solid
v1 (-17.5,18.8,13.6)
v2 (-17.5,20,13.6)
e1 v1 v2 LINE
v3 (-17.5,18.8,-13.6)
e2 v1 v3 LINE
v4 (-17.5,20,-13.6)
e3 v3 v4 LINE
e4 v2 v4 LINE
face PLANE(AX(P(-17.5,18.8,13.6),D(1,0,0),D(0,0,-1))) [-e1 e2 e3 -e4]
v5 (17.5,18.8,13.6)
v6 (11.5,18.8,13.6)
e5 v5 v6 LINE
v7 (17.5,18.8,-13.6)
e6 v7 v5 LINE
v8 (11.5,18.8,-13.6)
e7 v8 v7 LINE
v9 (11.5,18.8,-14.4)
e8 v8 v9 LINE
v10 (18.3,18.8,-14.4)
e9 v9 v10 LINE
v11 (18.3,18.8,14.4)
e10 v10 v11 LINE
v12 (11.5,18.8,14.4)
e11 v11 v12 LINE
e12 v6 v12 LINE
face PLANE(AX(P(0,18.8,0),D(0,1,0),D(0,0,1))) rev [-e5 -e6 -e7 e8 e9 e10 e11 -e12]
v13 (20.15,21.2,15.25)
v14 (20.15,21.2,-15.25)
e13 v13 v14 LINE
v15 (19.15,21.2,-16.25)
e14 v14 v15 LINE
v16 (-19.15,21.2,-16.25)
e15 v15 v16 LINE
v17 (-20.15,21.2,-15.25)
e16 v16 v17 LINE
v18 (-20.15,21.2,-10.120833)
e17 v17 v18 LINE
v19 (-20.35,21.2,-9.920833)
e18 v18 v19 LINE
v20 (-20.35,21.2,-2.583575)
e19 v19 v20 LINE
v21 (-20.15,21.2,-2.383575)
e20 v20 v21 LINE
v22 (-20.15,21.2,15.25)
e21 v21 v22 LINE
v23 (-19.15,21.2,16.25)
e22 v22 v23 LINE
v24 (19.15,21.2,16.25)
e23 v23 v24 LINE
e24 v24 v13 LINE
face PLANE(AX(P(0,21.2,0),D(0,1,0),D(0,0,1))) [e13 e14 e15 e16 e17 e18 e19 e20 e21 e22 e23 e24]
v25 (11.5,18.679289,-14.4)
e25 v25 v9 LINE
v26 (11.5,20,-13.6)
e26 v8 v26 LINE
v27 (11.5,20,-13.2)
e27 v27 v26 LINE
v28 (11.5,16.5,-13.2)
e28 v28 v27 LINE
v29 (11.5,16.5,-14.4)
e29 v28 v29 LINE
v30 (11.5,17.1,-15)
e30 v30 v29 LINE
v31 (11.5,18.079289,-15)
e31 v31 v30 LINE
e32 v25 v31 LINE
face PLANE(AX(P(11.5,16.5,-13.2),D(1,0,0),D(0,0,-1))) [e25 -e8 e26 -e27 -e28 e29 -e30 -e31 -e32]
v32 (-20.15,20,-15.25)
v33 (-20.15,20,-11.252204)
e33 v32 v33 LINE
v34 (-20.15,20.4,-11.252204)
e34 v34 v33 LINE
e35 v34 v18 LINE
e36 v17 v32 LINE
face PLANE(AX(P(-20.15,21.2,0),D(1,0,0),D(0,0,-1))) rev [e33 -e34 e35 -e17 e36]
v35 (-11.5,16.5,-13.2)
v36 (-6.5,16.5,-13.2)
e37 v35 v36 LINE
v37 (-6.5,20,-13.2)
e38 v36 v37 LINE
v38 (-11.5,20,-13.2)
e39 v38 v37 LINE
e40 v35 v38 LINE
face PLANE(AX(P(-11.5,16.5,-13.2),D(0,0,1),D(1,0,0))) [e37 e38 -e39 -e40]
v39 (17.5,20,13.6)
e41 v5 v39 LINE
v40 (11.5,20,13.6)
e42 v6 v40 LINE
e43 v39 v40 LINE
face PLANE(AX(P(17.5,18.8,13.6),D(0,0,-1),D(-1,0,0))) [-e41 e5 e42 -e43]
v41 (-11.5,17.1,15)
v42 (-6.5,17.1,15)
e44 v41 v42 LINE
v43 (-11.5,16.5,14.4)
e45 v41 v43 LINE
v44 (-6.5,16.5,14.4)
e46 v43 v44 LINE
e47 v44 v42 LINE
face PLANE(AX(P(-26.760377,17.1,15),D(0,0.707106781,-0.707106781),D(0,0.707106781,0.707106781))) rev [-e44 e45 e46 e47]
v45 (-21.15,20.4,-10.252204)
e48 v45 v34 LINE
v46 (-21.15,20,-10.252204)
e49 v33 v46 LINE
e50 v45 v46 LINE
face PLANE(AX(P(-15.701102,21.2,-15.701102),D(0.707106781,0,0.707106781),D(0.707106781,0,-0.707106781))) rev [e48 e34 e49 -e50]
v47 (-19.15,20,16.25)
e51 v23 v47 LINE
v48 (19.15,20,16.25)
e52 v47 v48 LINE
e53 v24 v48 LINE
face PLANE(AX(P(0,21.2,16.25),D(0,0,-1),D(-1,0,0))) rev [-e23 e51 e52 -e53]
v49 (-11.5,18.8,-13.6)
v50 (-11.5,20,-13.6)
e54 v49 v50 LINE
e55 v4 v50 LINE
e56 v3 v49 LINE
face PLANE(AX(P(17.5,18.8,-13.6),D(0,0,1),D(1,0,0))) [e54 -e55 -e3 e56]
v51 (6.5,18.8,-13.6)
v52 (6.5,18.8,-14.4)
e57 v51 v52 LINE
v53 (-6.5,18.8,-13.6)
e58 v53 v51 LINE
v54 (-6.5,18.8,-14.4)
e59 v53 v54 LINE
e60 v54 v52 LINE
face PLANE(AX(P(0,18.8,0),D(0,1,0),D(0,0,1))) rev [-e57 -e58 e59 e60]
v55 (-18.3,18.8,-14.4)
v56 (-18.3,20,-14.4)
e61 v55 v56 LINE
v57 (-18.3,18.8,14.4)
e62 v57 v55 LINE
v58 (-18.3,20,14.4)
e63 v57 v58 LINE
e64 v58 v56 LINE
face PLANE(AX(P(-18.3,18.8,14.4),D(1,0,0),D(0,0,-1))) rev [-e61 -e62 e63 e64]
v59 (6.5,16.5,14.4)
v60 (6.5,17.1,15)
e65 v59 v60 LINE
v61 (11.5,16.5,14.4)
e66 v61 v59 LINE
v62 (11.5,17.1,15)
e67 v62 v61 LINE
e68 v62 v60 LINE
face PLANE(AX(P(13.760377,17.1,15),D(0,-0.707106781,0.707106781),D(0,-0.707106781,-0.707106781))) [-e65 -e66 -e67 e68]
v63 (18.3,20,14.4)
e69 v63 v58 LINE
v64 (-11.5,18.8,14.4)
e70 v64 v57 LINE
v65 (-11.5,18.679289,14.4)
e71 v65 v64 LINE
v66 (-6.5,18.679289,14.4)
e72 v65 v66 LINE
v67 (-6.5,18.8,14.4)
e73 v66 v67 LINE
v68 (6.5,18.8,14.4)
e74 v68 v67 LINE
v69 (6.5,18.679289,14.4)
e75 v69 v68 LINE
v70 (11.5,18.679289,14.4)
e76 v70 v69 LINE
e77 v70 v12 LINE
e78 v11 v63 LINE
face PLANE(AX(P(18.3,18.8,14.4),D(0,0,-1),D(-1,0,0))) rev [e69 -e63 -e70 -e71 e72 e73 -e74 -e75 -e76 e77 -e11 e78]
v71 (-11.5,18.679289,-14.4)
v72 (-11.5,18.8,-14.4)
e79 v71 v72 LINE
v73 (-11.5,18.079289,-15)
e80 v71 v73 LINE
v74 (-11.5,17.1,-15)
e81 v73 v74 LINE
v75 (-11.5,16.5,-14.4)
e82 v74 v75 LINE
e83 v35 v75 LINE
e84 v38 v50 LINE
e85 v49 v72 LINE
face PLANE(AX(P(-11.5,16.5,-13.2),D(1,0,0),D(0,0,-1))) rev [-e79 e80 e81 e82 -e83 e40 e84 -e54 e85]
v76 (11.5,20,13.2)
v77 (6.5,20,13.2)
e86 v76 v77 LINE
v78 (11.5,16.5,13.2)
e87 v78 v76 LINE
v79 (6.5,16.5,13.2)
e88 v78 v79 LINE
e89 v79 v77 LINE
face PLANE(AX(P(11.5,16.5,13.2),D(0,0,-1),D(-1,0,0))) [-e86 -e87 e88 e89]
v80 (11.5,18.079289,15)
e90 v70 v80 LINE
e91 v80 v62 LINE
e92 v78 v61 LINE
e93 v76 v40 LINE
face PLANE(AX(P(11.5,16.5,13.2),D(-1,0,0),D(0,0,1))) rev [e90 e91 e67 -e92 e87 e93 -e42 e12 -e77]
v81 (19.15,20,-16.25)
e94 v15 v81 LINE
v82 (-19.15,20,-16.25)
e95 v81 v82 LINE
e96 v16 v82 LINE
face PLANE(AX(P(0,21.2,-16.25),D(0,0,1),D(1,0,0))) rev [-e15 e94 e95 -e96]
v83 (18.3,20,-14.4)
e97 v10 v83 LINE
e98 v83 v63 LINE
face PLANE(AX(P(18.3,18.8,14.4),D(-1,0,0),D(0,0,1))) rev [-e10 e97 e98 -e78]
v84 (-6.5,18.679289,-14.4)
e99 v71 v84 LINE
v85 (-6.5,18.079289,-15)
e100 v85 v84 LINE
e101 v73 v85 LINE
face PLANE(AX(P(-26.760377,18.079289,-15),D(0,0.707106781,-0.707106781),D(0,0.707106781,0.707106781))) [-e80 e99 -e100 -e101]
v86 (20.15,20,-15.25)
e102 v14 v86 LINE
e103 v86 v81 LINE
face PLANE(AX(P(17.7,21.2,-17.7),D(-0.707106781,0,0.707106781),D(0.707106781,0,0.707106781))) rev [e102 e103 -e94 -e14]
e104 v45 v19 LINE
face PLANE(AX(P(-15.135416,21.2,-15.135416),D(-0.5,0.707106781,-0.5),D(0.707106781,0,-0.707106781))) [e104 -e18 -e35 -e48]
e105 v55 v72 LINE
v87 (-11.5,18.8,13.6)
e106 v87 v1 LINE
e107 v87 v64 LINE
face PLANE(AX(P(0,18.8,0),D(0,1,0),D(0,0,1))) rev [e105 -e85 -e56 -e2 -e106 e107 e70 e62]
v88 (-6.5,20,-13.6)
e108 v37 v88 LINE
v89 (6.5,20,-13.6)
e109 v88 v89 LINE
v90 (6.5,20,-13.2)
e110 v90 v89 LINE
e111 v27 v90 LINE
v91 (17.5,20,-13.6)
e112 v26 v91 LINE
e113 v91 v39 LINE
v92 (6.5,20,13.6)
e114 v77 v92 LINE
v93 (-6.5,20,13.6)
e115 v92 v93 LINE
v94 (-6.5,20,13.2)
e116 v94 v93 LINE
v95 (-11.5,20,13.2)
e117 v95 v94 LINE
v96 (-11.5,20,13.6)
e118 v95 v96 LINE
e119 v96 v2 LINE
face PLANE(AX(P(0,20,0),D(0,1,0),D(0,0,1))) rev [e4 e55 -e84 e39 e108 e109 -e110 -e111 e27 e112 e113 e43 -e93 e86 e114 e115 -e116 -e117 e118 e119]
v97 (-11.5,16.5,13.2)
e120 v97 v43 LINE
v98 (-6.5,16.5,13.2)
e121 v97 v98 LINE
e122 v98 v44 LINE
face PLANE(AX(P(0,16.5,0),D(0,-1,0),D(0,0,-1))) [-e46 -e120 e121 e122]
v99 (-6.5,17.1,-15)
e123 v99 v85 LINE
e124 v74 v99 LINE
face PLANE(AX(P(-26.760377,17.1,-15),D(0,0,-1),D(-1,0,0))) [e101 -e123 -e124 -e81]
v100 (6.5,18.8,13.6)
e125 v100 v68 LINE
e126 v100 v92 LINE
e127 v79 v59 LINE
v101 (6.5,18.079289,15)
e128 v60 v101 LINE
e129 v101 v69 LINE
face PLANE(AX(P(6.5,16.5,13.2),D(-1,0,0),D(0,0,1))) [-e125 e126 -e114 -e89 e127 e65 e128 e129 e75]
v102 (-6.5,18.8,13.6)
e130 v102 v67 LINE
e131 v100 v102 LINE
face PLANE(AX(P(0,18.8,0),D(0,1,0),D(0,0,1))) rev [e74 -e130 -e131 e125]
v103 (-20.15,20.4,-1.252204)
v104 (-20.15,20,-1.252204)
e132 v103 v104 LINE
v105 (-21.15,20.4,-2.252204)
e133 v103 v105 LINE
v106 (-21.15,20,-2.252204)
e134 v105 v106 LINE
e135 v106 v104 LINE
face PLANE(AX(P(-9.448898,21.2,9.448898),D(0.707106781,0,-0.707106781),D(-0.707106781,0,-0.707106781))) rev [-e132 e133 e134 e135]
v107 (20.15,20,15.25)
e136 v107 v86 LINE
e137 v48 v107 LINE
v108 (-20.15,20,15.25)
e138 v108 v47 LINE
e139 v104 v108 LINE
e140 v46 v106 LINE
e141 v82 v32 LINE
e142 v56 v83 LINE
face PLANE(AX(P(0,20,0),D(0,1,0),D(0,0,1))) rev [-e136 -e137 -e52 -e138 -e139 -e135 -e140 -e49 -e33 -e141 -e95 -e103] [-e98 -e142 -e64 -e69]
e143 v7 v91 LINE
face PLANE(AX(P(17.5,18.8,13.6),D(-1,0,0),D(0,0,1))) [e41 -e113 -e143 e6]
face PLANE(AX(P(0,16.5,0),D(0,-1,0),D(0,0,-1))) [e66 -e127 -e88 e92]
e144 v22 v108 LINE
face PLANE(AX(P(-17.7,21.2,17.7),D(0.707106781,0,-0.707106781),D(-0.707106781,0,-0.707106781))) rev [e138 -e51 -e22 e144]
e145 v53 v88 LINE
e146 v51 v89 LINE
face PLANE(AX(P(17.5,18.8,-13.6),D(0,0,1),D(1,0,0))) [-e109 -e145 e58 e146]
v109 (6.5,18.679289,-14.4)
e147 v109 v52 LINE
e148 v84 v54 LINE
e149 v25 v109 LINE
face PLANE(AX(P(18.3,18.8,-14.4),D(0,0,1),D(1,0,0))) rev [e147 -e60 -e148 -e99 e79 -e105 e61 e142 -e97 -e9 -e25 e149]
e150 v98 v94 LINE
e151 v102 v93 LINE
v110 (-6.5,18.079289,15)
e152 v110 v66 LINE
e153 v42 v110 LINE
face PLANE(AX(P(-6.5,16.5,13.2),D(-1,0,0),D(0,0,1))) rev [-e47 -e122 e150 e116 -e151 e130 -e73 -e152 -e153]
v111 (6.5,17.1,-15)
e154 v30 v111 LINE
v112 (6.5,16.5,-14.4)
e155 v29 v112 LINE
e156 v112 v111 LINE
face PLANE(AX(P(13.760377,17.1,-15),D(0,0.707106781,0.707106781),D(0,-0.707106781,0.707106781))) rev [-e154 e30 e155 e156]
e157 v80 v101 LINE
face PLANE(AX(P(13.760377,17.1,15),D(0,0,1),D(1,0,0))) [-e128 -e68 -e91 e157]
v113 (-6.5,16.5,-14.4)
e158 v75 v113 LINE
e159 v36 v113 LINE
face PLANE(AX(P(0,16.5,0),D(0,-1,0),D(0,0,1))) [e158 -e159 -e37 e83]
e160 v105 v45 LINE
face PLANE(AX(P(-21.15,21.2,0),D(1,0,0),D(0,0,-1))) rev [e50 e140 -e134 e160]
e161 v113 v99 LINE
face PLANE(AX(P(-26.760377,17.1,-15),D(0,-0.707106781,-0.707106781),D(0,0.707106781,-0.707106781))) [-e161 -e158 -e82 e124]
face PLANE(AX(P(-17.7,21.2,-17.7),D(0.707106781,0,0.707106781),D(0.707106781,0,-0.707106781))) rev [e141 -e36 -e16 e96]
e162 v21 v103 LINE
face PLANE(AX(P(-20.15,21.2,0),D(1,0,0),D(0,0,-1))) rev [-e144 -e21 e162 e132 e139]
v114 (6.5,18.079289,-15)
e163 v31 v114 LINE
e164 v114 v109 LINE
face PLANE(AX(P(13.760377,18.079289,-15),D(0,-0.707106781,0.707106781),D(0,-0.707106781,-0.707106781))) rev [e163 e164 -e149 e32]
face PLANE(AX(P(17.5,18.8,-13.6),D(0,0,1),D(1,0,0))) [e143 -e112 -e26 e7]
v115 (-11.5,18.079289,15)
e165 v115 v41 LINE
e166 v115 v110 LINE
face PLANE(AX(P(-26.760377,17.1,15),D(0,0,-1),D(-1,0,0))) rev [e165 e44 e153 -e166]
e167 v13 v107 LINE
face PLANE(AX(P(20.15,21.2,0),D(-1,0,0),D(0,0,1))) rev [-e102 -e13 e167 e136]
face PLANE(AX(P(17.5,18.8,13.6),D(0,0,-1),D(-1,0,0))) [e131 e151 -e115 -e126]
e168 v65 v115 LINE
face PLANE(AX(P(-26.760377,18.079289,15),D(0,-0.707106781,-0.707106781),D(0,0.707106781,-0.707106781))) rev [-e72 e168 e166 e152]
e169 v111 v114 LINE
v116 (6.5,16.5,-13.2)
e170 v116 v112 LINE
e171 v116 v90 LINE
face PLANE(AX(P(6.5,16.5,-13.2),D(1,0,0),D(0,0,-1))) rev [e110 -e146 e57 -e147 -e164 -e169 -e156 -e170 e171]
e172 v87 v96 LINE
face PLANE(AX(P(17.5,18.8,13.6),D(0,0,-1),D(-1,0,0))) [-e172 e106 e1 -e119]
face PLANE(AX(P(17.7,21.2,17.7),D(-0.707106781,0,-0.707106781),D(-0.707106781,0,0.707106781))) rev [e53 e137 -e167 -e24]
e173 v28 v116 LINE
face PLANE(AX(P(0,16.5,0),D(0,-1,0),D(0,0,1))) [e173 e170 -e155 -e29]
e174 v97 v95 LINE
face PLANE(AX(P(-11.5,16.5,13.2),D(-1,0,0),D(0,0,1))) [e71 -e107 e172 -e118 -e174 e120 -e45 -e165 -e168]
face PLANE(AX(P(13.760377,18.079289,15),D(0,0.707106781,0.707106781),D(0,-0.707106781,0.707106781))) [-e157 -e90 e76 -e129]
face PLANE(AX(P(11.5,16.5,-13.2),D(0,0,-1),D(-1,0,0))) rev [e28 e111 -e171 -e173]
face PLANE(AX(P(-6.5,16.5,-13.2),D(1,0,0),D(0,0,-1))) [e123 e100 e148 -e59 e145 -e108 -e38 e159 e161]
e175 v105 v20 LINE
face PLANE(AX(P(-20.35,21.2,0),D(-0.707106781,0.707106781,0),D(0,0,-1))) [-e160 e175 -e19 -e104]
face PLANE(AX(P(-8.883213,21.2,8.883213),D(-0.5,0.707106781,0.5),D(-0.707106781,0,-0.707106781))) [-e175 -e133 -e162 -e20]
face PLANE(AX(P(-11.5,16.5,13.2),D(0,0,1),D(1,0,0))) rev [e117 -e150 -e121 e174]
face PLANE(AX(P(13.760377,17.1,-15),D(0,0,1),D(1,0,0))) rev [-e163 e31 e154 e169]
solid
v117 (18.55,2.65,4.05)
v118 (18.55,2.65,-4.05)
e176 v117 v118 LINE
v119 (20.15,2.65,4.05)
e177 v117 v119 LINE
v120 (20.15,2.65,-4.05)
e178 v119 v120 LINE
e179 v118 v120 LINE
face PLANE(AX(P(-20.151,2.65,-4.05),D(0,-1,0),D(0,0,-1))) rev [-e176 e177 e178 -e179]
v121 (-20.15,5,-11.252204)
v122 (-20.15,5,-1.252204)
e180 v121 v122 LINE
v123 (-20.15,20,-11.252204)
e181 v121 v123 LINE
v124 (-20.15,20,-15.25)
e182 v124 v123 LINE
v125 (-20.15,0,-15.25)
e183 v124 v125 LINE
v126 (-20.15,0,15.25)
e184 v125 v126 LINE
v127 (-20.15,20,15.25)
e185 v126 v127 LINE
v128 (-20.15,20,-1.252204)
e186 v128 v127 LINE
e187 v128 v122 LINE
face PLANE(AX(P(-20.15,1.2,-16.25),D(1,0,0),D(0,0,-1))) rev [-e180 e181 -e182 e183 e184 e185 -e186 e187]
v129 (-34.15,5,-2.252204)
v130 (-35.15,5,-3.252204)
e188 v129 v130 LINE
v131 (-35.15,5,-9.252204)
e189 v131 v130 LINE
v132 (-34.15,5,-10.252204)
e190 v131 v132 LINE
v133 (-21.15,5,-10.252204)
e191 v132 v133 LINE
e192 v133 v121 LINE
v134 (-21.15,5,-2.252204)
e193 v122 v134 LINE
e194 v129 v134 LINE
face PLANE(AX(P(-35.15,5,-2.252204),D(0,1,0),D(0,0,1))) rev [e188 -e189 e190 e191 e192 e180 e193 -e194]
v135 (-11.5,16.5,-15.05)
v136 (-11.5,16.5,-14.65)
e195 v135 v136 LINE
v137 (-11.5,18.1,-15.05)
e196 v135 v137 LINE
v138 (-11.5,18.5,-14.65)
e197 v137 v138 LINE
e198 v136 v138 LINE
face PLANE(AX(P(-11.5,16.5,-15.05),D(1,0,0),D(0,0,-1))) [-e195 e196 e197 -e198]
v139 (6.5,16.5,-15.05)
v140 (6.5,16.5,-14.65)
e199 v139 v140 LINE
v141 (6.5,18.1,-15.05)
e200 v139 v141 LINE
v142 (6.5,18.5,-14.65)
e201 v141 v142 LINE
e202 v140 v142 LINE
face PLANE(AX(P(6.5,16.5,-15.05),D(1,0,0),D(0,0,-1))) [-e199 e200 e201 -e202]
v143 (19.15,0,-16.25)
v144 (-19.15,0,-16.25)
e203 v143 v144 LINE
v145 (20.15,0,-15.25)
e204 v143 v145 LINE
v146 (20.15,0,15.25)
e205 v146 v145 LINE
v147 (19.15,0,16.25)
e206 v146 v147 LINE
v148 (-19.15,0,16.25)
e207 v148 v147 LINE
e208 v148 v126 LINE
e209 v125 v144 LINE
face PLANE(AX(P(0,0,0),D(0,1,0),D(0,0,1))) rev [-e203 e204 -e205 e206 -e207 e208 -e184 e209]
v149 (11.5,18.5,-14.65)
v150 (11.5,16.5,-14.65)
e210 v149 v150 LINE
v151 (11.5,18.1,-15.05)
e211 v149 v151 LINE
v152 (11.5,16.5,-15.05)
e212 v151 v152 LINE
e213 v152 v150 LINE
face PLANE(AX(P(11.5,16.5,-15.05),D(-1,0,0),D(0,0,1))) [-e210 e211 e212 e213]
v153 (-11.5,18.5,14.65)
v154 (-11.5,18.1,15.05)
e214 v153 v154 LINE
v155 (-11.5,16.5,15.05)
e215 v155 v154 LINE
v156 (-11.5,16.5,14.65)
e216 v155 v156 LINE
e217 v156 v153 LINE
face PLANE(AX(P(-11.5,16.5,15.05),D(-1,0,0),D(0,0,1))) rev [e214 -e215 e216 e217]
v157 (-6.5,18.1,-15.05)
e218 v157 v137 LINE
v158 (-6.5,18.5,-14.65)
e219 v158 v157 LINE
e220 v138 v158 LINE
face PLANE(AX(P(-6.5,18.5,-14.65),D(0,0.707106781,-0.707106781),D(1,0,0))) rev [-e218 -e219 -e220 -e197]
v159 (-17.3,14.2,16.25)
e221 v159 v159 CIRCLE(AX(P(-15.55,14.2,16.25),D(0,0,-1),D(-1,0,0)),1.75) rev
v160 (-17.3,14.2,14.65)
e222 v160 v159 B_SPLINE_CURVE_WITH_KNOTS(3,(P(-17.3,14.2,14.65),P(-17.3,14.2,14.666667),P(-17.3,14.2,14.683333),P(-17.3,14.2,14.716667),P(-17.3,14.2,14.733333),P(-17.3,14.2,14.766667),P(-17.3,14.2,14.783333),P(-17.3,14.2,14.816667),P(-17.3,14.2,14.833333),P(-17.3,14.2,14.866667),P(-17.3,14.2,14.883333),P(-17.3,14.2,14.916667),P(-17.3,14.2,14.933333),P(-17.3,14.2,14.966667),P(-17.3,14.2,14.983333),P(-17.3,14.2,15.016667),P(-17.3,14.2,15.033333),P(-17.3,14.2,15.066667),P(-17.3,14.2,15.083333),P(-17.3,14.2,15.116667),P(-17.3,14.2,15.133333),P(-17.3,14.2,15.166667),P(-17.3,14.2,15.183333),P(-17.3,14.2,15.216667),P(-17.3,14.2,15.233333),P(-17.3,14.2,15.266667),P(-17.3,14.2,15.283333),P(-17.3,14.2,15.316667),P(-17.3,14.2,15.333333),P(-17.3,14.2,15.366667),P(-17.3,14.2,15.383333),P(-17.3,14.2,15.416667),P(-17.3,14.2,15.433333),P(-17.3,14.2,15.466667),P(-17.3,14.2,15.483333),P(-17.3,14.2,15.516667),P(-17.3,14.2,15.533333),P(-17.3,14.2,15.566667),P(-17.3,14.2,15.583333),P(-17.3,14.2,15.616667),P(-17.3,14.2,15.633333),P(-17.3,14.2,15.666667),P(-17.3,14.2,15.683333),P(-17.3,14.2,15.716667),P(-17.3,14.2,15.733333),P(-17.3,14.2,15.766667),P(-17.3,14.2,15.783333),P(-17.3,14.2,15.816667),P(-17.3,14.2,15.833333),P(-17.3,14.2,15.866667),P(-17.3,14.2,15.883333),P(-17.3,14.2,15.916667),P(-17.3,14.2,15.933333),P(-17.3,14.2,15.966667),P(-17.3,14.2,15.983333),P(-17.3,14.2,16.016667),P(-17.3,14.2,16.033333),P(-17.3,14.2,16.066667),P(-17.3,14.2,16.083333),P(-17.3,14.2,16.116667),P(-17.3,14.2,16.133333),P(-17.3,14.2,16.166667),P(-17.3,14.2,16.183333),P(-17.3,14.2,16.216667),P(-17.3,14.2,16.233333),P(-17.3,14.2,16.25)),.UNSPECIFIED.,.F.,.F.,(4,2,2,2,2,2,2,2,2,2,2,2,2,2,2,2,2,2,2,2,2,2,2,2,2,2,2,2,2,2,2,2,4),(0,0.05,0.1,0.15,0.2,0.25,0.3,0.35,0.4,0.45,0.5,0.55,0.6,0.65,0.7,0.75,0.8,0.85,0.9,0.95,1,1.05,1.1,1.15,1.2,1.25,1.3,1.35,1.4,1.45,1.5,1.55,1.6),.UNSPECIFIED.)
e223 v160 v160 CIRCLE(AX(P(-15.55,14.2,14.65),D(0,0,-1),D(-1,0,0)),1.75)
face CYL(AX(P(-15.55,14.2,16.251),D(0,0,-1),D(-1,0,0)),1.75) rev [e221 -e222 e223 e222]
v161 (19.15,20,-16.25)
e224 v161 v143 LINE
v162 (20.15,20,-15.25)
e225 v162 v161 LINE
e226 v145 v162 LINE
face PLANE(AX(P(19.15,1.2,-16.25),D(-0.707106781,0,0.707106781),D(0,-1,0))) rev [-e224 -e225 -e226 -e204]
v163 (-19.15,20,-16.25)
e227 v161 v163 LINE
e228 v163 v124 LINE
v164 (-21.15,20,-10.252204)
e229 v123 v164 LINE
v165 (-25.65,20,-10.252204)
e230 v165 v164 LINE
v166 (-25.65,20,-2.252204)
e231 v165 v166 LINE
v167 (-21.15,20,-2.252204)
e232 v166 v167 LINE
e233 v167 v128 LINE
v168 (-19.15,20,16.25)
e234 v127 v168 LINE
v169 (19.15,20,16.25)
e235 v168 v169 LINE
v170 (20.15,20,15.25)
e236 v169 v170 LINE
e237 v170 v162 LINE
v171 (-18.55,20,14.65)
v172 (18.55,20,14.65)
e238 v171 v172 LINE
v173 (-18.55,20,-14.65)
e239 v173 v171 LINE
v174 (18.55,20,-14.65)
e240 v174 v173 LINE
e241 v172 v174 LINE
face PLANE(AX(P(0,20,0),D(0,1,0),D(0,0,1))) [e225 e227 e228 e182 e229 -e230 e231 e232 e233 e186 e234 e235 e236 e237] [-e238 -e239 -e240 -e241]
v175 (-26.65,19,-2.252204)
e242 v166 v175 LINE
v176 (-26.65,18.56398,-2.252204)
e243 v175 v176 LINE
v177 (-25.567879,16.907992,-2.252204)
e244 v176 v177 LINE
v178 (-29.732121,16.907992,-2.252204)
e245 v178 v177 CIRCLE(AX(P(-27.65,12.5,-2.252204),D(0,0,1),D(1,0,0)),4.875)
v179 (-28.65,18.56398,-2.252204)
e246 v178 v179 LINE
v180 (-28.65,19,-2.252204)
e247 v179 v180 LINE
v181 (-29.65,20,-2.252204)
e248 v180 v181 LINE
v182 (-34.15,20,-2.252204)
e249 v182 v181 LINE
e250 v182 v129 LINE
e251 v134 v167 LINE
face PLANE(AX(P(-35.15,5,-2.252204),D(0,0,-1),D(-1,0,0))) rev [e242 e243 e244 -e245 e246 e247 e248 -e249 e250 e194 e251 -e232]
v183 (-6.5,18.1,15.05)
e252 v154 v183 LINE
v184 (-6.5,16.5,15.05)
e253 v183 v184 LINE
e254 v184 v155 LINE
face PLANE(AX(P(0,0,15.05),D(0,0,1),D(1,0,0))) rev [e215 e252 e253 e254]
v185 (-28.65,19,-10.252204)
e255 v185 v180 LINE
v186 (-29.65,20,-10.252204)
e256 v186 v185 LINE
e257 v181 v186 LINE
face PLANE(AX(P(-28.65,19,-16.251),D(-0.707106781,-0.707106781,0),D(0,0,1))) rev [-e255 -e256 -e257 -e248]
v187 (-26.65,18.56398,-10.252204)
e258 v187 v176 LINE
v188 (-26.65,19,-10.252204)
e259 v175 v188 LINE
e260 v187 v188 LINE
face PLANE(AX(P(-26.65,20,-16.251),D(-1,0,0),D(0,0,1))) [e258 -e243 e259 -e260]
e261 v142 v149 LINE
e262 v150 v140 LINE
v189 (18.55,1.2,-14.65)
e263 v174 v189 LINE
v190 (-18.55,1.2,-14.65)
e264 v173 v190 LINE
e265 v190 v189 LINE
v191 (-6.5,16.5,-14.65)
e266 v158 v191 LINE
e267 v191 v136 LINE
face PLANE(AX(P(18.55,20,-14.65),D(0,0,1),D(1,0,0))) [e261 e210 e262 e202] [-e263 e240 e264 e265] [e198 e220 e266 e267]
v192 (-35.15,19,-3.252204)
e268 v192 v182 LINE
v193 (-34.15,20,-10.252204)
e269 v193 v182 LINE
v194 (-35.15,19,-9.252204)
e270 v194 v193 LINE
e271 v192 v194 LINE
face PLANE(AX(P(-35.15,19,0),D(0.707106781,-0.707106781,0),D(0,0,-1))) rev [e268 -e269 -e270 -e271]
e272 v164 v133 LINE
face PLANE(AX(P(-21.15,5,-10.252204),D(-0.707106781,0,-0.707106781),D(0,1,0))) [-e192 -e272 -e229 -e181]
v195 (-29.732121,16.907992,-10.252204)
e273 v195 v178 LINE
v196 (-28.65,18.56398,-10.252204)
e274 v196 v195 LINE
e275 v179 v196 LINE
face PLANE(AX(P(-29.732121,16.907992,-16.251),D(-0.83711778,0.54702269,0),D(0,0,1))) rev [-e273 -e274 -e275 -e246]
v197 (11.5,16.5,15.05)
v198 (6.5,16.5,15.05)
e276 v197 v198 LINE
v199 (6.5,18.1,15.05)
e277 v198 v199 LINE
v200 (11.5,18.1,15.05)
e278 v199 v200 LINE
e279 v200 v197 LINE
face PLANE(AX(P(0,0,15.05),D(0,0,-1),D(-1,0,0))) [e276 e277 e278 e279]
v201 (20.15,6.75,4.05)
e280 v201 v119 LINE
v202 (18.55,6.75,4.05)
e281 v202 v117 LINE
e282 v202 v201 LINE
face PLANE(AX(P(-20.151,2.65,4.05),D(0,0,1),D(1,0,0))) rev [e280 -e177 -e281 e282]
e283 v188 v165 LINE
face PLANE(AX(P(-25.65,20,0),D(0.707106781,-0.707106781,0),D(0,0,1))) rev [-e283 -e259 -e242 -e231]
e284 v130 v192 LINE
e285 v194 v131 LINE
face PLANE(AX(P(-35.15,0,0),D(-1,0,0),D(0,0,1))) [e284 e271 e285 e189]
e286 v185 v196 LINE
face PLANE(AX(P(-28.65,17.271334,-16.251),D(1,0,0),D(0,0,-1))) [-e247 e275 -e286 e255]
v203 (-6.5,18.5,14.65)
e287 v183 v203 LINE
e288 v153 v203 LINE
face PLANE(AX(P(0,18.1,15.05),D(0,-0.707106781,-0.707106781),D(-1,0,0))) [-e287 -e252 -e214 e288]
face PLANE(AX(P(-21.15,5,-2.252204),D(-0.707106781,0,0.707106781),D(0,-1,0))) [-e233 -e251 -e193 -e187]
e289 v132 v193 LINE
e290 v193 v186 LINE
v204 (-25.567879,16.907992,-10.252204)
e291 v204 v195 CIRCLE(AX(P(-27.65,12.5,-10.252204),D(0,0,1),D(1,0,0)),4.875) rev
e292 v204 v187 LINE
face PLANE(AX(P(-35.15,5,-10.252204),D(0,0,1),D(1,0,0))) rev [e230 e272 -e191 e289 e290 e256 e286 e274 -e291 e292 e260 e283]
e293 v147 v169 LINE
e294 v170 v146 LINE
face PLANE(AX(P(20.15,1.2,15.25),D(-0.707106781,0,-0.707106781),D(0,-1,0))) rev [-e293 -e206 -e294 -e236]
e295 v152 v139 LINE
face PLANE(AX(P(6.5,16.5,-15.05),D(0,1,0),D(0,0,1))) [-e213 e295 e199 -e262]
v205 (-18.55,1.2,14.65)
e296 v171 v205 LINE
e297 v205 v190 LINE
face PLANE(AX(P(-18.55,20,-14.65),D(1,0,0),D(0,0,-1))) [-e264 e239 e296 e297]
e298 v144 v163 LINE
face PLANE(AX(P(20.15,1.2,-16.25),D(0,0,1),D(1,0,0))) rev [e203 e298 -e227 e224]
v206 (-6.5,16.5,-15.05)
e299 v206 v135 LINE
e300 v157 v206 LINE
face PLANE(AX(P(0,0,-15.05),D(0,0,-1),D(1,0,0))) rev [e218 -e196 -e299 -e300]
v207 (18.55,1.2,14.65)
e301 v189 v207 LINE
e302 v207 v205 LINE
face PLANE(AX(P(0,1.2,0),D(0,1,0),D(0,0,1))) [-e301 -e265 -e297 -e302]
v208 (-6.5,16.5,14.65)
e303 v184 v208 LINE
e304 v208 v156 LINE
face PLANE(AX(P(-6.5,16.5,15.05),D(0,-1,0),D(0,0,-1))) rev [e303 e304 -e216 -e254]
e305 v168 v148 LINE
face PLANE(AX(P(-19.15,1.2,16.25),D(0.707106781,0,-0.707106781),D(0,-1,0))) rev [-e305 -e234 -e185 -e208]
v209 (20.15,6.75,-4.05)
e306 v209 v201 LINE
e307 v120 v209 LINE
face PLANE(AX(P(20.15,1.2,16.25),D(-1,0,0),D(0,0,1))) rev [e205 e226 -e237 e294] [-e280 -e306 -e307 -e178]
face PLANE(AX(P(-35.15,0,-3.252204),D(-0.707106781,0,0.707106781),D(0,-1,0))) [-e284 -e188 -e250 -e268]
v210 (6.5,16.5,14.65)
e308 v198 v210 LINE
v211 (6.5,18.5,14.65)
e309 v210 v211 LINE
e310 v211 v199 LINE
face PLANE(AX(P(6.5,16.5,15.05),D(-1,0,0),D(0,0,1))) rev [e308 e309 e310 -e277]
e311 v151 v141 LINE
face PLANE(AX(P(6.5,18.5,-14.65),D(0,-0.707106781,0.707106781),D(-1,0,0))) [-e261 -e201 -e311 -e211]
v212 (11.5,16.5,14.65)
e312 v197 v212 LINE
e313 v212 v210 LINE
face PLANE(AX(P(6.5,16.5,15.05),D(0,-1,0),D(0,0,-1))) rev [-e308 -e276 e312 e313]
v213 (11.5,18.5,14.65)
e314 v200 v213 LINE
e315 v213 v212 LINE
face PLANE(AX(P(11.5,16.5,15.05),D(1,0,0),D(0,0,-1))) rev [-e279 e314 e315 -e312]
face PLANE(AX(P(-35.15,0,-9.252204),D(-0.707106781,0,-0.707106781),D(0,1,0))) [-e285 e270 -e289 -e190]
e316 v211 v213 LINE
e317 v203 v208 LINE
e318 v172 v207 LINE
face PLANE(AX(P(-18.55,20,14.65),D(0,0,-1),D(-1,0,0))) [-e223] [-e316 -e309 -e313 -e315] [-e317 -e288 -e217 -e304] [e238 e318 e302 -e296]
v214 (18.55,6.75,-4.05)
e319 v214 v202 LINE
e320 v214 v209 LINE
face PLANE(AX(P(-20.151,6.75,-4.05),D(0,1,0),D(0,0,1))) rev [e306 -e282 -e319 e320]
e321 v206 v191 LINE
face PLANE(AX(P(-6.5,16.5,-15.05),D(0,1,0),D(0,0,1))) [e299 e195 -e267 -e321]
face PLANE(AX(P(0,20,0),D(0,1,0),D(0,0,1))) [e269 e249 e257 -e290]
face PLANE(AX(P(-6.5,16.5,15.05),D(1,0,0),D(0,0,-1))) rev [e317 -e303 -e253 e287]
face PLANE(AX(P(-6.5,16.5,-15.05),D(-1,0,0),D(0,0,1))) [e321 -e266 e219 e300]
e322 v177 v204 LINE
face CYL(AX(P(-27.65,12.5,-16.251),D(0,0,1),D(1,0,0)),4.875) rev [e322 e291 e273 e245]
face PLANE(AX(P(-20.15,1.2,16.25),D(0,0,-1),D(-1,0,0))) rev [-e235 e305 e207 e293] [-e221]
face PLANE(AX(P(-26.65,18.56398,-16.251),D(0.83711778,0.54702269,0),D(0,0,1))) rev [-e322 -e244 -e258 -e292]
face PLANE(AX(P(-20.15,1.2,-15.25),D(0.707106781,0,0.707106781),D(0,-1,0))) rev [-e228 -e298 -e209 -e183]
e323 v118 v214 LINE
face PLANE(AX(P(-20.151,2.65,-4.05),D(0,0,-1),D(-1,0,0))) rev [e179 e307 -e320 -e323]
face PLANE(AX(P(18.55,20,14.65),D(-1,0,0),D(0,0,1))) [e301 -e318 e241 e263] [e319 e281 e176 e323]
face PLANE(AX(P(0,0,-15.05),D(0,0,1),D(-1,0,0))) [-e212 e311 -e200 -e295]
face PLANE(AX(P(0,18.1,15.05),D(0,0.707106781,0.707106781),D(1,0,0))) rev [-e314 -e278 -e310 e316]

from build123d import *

# Parameters (mm, degrees)
SKETCH2_W                = 40.3
SKETCH2_H                = 32.5
BOSS_EXTRUDE1_DEPTH      = 1.2
SKETCH2_3_W              = 40.3
SKETCH2_3_H              = 32.5
SKETCH2_3_W_2            = 37.1
SKETCH2_3_H_2            = 29.3
BOSS_EXTRUDE2_DEPTH      = 20
CUT_EXTRUDE1_REACH       = 49.835
SKETCH3_W                = 8.1
SKETCH3_H                = 4.1
CHAMFER1_SIZE            = 1
SKETCH4_W                = 8
SKETCH4_H                = 15
BOSS_EXTRUDE3_DEPTH      = 15
CUT_EXTRUDE3_REACH       = 46.473
CHAMFER2_SIZE            = 1.292646163
CHAMFER2_SIZE_2          = 1
CHAMFER3_SIZE            = 1
SKETCH6_W                = 5
SKETCH6_H                = 2
CUT_EXTRUDE4_DEPTH       = 0.4
CHAMFER4_SIZE            = 0.4
CHAMFER4_OF_MIRROR1_SIZE = 0.4
SKETCH7_W                = 37.1
SKETCH7_H                = 29.3
BOSS_EXTRUDE4_DEPTH      = 1.2
CHAMFER5_SIZE            = 0.8
SKETCH8_W                = 36.6
SKETCH8_H                = 28.8
SKETCH8_W_2              = 35
SKETCH8_H_2              = 27.2
BOSS_EXTRUDE5_DEPTH      = 1.2
SKETCH10_W               = 5
SKETCH10_H               = 1.2
BOSS_EXTRUDE6_DEPTH      = 3.5
BOSS_EXTRUDE7_DEPTH      = 5
CUT_EXTRUDE6_START       = -11.5
CUT_EXTRUDE6_DEPTH       = 5
CUT_EXTRUDE6_START_2     = 6.5
CUT_EXTRUDE6_2_DEPTH     = 5
CUT_EXTRUDE6_START_3     = 14.65
CUT_EXTRUDE6_3_OUTLINE_R = 1.75
CUT_EXTRUDE6_3_DEPTH     = 1.6


with BuildPart() as part:
    # Sketch2 → Boss-Extrude1 (new body)
    with BuildSketch(Plane(origin=(0, 0, 0), x_dir=(1, 0, 0), z_dir=(0, 1, 0))):
        Rectangle(SKETCH2_W, SKETCH2_H)
    extrude(amount=BOSS_EXTRUDE1_DEPTH)

    # Sketch2<3> → Boss-Extrude2 (add)
    with BuildSketch(Plane(origin=(0, 0, 0), x_dir=(1, 0, 0), z_dir=(0, 1, 0))):
        Rectangle(SKETCH2_3_W, SKETCH2_3_H)
        Rectangle(SKETCH2_3_W_2, SKETCH2_3_H_2, mode=Mode.SUBTRACT)
    extrude(amount=BOSS_EXTRUDE2_DEPTH)

    # Sketch3 → Cut-Extrude1 (cut, up to next)
    with BuildSketch(Plane(origin=(20.15, 0, 0), x_dir=(0, 0, -1), z_dir=(1, 0, 0)), mode=Mode.PRIVATE) as cut_extrude1_sk1:
        with Locations((0, 4.7)):
            Rectangle(SKETCH3_W, SKETCH3_H)
    cut_extrude1_tool1 = extrude(cut_extrude1_sk1.sketch, amount=-CUT_EXTRUDE1_REACH, mode=Mode.PRIVATE) & part.part
    add(cut_extrude1_tool1.solids().sort_by_distance((20.15, 4.7, 0))[0], mode=Mode.SUBTRACT)

    # Chamfer1
    chamfer1_edges = [part.edges().sort_by_distance(p)[0] for p in [
        (-20.15, 10, -16.25),
        (20.15, 10, -16.25),
        (20.15, 10, 16.25),
        (-20.15, 10, 16.25),
    ]]
    chamfer(chamfer1_edges, length=CHAMFER1_SIZE)

    # Sketch4 → Boss-Extrude3 (add)
    with BuildSketch(Plane.ZY.offset(20.15)):
        with Locations((-6.25220384, 12.5)):
            Rectangle(SKETCH4_W, SKETCH4_H)
    extrude(amount=BOSS_EXTRUDE3_DEPTH)

    # Sketch5 → Cut-Extrude3 (cut, up to next)
    with BuildSketch(Plane.XY.offset(-2.25220384), mode=Mode.PRIVATE) as cut_extrude3_sk1:
        with BuildLine():
            Line((-28.65, 17.271333671), (-28.65, 20))
            Line((-28.65, 20), (-26.65, 20))
            Line((-26.65, 20), (-26.65, 17.271333671))
            ThreePointArc((-26.65, 17.271333671), (-27.65, 7.625), (-28.65, 17.271333671))
        make_face()
    cut_extrude3_tool1 = extrude(cut_extrude3_sk1.sketch, amount=-CUT_EXTRUDE3_REACH, mode=Mode.PRIVATE) & part.part
    add(cut_extrude3_tool1.solids().sort_by_distance((-27.65, 12.91032, -2.252204))[0], mode=Mode.SUBTRACT)

    # Chamfer2
    # the kernel refuses this chamfer: 1.292646163, 1 mm, written as the material it takes off along each edge
    with BuildSketch(Plane(origin=(-28.65, 17.271333671, 1.088369735), x_dir=(0, 1, 0), z_dir=(0, 0, -1))) as chamfer2_piece_1:
        with BuildLine():
            Line((CHAMFER2_SIZE, 0), (-0.363341225, -1.082120936))
            ThreePointArc((-0.363341225, -1.082120936), (-0.156455935, -0.571155143), (0, 0))
            Line((0, 0), (CHAMFER2_SIZE, 0))
        make_face()
    extrude(amount=14.68114715, mode=Mode.SUBTRACT)
    with BuildSketch(Plane(origin=(-28.65, 20, 0.319479148), x_dir=(-1, 0, 0), z_dir=(0, 0, -1))) as chamfer2_piece_2:
        Polygon((CHAMFER2_SIZE_2, 0), (0, -CHAMFER2_SIZE_2), (0, 0), align=None)
    extrude(amount=13.143365976, mode=Mode.SUBTRACT)
    with BuildSketch(Plane(origin=(-26.65, 20, 0.319479148), x_dir=(1, 0, 0), z_dir=(0, 0, -1))) as chamfer2_piece_3:
        Polygon((CHAMFER2_SIZE_2, 0), (0, CHAMFER2_SIZE_2), (0, 0), align=None)
    extrude(amount=13.143365976, mode=Mode.SUBTRACT)
    with BuildSketch(Plane(origin=(-26.65, 17.271333671, 1.088369735), x_dir=(0, 1, 0), z_dir=(0, 0, -1))) as chamfer2_piece_4:
        with BuildLine():
            Line((CHAMFER2_SIZE, 0), (-0.363341225, 1.082120936))
            ThreePointArc((-0.363341225, 1.082120936), (-0.156455935, 0.571155143), (0, 0))
            Line((0, 0), (CHAMFER2_SIZE, 0))
        make_face()
    extrude(amount=14.68114715, mode=Mode.SUBTRACT)

    # Chamfer3
    chamfer3_edges = [part.edges().sort_by_distance(p)[0] for p in [
        (-20.15, 12.5, -10.25220384),
        (-20.15, 12.5, -2.25220384),
        (-35.15, 12.5, -10.25220384),
        (-35.15, 12.5, -2.25220384),
        (-35.15, 20, -6.25220384),
    ]]
    chamfer(chamfer3_edges, length=CHAMFER3_SIZE)

    # Sketch6 → Cut-Extrude4 (cut)
    with BuildSketch(Plane(origin=(0, 0, 14.65), x_dir=(-1, 0, 0), z_dir=(0, 0, -1))):
        with Locations((-9, 17.5)):
            Rectangle(SKETCH6_W, SKETCH6_H)
        with Locations((9, 17.5)):
            Rectangle(SKETCH6_W, SKETCH6_H)
    cut_extrude4 = extrude(amount=-CUT_EXTRUDE4_DEPTH, mode=Mode.SUBTRACT)

    # Chamfer4
    chamfer4_edges = [part.edges().sort_by_distance(p)[0] for p in [
        (9, 18.5, 15.05),
        (-9, 18.5, 15.05),
    ]]
    chamfer(chamfer4_edges, length=CHAMFER4_SIZE - 0.0001)  # a hair under: the kernel refuses the full size

    # Mirror1: Cut-Extrude4 across plane
    add(cut_extrude4.mirror(Plane.XY), mode=Mode.SUBTRACT)

    # Chamfer4 of Mirror1
    chamfer4_of_mirror1_edges = [part.edges().sort_by_distance(p)[0] for p in [
        (9, 18.5, -15.05),
        (-9, 18.5, -15.05),
    ]]
    chamfer(chamfer4_of_mirror1_edges, length=CHAMFER4_OF_MIRROR1_SIZE - 0.0001)  # a hair under: the kernel refuses the full size

    # Cut-Extrude6 3 outline → Cut-Extrude6 3 (cut)
    with BuildSketch(Plane.XY.offset(CUT_EXTRUDE6_START_3)):
        with Locations((-15.55, 14.2)):
            Circle(CUT_EXTRUDE6_3_OUTLINE_R)
    extrude(amount=CUT_EXTRUDE6_3_DEPTH, mode=Mode.SUBTRACT)


with BuildPart() as body_2:
    # Sketch7 → Boss-Extrude4 (new body)
    # profile 1 of 2: a face of its own
    with BuildSketch(Plane(origin=(0, 20, 0), x_dir=(1, 0, 0), z_dir=(0, 1, 0))):
        Polygon((-21.15, 10.25220384), (-21.15, 2.25220384), (-20.15, 1.25220384), (-20.15, -15.25), (-19.15, -16.25), (19.15, -16.25), (20.15, -15.25), (20.15, 15.25), (19.15, 16.25), (-19.15, 16.25), (-20.15, 15.25), (-20.15, 11.25220384), align=None)
        Rectangle(SKETCH7_W, SKETCH7_H, mode=Mode.SUBTRACT)
    # profile 2 of 2: a face of its own
    with BuildSketch(Plane(origin=(0, 20, 0), x_dir=(1, 0, 0), z_dir=(0, 1, 0))):
        Rectangle(SKETCH7_W, SKETCH7_H)
    extrude(amount=BOSS_EXTRUDE4_DEPTH)

    # Chamfer5
    chamfer5_edges = [body_2.edges().sort_by_distance(p)[0] for p in [
        (-21.15, 21.2, -6.25220384),
        (-20.65, 21.2, -1.75220384),
        (-20.65, 21.2, -10.75220384),
    ]]
    chamfer(chamfer5_edges, length=CHAMFER5_SIZE)

    # Sketch8 → Boss-Extrude5 (add)
    with BuildSketch(Plane.XZ.offset(-20)):
        Rectangle(SKETCH8_W, SKETCH8_H)
        Rectangle(SKETCH8_W_2, SKETCH8_H_2, mode=Mode.SUBTRACT)
    extrude(amount=BOSS_EXTRUDE5_DEPTH)

    # Sketch10 → Boss-Extrude6 (add)
    with BuildSketch(Plane.XZ.offset(-20)):
        with Locations((9, 13.8)):
            Rectangle(SKETCH10_W, SKETCH10_H)
    extrude(amount=BOSS_EXTRUDE6_DEPTH)

    # Sketch13 → Boss-Extrude7 (add)
    with BuildSketch(Plane.ZY.offset(-6.5)):
        Polygon((15, 18.079289322), (14.4, 18.679289322), (14.4, 16.5), (15, 17.1), align=None)
    extrude(amount=-BOSS_EXTRUDE7_DEPTH)

    # Cut-Extrude6: read off the stored shape, not the designer's step
    # Cut-Extrude6 outline → Cut-Extrude6 (add)
    with BuildSketch(Plane.YZ.offset(CUT_EXTRUDE6_START)):
        Polygon((20, 13.2), (20, 13.6), (18.8, 13.6), (18.8, 14.4), (18.679289322, 14.4), (18.079289322, 15), (17.1, 15), (16.5, 14.4), (16.5, 13.2), align=None)
        Polygon((20, -13.6), (20, -13.2), (16.5, -13.2), (16.5, -14.4), (17.1, -15), (18.079289322, -15), (18.679289322, -14.4), (18.8, -14.4), (18.8, -13.6), align=None)
    extrude(amount=CUT_EXTRUDE6_DEPTH)

    # Cut-Extrude6 2 outline → Cut-Extrude6 2 (add)
    with BuildSketch(Plane.YZ.offset(CUT_EXTRUDE6_START_2)):
        Polygon((20, -13.6), (20, -13.2), (16.5, -13.2), (16.5, -14.4), (17.1, -15), (18.079289322, -15), (18.679289322, -14.4), (18.8, -14.4), (18.8, -13.6), align=None)
    extrude(amount=CUT_EXTRUDE6_2_DEPTH)


solid = Compound([part.part, body_2.part])
